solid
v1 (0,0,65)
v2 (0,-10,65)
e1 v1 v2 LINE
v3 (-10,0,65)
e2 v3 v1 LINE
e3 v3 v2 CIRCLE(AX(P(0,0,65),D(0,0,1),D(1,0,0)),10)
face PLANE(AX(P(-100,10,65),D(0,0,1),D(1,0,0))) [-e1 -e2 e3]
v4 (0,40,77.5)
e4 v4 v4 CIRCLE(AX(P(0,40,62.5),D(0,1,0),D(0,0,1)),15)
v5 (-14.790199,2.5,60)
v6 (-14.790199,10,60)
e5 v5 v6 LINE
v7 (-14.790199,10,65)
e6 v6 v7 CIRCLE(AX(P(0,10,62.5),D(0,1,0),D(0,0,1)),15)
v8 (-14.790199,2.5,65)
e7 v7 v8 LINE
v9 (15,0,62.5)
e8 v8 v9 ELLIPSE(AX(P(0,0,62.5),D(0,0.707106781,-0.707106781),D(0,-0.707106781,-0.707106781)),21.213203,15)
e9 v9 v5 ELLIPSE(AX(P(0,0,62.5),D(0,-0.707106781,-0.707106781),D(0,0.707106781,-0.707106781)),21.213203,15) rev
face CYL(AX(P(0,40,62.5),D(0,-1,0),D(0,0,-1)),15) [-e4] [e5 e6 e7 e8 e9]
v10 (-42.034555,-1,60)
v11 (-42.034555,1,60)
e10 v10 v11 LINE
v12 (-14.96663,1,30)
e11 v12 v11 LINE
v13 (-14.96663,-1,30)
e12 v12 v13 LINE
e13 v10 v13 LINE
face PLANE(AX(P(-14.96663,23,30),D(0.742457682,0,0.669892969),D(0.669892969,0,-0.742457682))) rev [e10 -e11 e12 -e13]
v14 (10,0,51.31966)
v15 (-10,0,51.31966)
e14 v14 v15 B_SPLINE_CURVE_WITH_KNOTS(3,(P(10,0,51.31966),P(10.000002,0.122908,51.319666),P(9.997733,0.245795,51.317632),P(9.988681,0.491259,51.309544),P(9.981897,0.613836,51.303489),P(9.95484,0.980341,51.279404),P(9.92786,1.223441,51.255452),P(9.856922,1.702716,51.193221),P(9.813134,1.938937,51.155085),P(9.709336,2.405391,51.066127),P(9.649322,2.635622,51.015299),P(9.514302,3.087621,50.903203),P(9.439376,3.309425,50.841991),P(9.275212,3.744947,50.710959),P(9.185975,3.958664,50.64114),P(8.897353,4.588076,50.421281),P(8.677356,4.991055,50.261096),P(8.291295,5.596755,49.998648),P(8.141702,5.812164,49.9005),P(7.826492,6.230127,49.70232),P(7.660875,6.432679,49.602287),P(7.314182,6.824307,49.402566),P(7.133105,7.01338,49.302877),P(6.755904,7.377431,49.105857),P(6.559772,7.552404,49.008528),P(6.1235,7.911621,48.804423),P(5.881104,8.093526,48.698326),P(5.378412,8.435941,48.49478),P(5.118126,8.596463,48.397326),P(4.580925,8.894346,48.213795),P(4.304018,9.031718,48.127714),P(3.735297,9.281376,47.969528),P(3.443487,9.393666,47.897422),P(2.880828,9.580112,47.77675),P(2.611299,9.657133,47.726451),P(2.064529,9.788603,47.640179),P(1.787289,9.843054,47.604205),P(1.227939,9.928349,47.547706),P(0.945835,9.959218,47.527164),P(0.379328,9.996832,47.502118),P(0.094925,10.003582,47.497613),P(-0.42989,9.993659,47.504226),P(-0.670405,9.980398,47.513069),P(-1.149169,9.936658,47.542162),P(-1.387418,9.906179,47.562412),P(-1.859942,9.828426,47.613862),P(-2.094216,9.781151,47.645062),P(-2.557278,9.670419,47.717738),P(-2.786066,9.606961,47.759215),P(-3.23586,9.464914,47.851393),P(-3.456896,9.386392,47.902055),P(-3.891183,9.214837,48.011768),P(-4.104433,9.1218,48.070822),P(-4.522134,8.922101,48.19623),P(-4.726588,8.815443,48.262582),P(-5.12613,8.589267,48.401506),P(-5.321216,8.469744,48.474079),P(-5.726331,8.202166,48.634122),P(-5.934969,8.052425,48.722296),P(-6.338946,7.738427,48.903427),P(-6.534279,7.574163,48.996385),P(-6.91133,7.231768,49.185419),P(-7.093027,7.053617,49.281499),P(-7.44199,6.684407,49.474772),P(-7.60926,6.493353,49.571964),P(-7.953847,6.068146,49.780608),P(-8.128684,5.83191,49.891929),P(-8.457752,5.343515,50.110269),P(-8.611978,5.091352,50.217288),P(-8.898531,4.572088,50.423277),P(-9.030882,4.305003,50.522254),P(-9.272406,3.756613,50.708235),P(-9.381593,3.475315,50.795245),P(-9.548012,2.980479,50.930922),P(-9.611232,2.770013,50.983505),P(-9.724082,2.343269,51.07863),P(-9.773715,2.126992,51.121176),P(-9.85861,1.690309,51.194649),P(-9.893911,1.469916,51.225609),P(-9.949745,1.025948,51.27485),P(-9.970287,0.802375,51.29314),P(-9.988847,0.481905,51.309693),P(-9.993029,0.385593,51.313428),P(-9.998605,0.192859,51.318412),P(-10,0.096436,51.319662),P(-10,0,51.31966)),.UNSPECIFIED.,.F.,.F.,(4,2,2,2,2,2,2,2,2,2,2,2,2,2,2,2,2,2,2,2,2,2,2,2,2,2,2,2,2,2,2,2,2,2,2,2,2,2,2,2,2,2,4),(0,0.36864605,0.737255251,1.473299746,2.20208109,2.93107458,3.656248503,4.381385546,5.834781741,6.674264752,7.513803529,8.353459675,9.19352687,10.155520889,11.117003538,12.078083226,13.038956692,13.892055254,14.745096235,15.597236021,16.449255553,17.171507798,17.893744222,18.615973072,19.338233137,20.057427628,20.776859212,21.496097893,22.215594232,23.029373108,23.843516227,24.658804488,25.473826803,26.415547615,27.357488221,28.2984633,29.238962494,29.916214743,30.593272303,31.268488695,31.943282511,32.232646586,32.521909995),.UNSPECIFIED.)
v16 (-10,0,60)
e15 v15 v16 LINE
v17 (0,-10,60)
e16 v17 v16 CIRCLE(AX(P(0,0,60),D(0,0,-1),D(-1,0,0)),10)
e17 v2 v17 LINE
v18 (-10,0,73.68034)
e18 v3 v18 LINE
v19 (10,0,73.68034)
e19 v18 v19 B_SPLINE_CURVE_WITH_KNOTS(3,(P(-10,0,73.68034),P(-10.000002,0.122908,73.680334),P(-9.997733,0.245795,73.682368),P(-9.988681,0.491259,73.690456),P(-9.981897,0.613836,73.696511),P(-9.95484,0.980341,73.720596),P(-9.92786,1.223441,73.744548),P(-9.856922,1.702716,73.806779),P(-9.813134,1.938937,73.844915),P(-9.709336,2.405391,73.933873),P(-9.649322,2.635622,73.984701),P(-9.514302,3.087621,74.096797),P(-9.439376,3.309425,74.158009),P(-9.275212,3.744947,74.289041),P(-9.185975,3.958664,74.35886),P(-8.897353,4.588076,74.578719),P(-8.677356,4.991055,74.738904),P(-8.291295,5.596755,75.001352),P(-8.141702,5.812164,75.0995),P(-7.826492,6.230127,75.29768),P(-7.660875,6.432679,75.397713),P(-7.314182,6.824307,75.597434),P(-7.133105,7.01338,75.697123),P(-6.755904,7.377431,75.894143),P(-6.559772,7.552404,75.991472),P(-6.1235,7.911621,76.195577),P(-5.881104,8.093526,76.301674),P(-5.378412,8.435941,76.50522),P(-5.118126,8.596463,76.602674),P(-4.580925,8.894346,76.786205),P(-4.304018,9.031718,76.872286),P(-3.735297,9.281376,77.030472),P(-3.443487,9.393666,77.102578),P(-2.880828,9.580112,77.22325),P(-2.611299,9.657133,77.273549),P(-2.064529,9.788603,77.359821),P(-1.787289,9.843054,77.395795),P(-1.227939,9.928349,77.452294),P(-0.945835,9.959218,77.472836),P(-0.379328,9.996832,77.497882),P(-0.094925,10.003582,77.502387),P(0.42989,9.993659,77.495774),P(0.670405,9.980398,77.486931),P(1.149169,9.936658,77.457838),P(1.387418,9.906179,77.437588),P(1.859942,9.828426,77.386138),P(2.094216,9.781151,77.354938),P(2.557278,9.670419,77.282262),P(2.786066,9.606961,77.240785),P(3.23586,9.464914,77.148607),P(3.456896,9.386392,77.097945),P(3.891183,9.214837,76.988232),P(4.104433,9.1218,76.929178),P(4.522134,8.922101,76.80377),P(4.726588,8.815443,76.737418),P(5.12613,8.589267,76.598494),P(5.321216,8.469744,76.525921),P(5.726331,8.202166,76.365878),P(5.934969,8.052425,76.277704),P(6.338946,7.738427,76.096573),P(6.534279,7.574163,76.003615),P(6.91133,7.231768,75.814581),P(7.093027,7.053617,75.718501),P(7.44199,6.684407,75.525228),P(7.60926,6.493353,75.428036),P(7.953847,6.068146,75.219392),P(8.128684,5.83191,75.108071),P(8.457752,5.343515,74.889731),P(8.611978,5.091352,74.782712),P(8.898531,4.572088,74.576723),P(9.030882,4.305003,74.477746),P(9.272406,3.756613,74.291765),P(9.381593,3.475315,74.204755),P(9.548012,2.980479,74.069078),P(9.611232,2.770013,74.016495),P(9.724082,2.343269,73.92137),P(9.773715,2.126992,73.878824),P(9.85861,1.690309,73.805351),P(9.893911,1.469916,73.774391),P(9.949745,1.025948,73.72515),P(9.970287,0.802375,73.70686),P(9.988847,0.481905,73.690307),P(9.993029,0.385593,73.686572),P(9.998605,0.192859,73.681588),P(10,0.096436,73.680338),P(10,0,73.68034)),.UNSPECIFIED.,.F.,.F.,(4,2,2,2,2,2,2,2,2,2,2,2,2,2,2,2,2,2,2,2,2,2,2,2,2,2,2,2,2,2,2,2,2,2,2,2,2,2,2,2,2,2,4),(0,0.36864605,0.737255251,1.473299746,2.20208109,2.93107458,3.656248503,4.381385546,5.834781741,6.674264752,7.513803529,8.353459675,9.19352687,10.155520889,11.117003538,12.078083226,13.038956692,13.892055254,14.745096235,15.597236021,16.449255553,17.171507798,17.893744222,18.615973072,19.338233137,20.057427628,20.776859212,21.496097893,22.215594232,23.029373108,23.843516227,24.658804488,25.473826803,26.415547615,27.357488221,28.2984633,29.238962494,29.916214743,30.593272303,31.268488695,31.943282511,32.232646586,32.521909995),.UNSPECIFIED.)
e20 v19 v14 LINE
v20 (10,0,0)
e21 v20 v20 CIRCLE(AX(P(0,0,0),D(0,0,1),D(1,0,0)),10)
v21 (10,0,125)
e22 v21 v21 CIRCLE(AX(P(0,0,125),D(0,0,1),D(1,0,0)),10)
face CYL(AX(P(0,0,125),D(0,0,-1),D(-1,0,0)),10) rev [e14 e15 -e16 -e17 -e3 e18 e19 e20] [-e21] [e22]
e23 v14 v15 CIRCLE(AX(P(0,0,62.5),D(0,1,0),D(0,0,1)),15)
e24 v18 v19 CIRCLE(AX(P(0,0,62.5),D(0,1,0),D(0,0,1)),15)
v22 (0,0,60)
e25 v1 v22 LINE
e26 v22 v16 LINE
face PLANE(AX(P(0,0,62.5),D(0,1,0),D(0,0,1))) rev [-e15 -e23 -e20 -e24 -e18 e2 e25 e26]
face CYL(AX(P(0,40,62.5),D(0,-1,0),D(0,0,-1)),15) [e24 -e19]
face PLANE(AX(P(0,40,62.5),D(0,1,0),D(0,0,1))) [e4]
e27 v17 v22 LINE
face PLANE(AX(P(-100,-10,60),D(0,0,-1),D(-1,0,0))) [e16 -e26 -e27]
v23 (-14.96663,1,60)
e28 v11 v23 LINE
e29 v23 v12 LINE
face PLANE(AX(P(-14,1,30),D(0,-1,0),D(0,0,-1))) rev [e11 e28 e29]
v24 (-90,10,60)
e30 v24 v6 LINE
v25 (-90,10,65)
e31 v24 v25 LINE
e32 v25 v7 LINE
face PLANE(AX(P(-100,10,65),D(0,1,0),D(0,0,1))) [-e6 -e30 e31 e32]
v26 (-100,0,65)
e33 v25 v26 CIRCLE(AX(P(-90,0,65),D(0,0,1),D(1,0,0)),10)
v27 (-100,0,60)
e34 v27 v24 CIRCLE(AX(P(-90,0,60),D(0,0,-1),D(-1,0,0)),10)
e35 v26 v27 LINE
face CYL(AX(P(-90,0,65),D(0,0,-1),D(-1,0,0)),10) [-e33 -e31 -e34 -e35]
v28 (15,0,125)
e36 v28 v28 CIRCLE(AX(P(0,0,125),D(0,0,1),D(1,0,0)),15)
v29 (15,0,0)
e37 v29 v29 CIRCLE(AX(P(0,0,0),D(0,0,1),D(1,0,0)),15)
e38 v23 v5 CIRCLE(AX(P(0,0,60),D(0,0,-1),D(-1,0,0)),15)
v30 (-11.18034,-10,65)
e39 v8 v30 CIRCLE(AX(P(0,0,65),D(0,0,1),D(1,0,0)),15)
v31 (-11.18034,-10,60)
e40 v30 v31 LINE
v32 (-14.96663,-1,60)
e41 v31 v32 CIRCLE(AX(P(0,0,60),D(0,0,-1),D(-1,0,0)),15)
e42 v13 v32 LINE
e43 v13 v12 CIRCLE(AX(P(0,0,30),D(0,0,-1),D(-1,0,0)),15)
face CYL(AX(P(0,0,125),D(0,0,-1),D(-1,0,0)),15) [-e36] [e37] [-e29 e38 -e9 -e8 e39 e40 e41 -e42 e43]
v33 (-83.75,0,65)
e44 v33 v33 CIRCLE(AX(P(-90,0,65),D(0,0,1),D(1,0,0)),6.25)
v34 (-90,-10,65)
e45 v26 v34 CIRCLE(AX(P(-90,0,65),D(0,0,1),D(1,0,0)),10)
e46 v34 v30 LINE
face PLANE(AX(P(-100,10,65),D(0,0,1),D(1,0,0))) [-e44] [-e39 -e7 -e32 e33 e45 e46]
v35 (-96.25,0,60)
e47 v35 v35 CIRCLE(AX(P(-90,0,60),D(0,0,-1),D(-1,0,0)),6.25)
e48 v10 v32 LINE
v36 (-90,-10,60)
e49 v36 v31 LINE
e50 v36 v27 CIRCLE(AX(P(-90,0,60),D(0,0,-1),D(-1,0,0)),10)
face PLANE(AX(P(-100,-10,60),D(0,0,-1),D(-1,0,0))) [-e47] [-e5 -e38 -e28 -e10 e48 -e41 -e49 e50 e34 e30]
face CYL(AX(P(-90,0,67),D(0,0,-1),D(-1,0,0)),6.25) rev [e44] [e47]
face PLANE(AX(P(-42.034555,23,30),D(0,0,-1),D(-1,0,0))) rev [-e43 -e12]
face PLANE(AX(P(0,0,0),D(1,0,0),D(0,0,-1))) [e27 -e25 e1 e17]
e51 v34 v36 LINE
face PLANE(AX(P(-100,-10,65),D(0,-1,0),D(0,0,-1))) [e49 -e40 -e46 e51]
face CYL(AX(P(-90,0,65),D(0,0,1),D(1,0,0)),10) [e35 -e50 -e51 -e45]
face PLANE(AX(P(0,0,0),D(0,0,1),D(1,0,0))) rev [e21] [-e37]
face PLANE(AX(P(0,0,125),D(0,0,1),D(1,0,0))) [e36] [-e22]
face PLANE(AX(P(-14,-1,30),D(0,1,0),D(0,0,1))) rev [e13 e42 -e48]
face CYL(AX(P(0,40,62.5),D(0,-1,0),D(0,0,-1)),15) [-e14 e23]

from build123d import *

# Parameters (mm, degrees)
SKETCH1_R               = 15
SKETCH1_R_2             = 10
BOSS_EXTRUDE1_DEPTH     = 125
SKETCH2_R               = 15
BOSS_EXTRUDE2_DEPTH     = 40
SKETCH11_W              = 5
SKETCH11_H              = 20
BOSS_EXTRUDE6_DEPTH     = 100
FILLET1_R               = 10
SKETCH12_W              = 28.03455484
SKETCH12_H              = 2
BOSS_EXTRUDE7_DEPTH     = 30
CUT_EXTRUDE1_DEPTH      = 23
CUT_EXTRUDE1_DEPTH_BACK = 5
SKETCH16_R              = 6.25
CUT_EXTRUDE2_DEPTH      = 7


with BuildPart() as part:
    # Sketch1 → Boss-Extrude1 (new body)
    with BuildSketch(Plane.XY):
        Circle(SKETCH1_R)
        Circle(SKETCH1_R_2, mode=Mode.SUBTRACT)
    extrude(amount=BOSS_EXTRUDE1_DEPTH)

    # Sketch2 → Boss-Extrude2 (add)
    with BuildSketch(Plane(origin=(0, 0, 0), x_dir=(1, 0, 0), z_dir=(0, 1, 0))):
        with Locations((0, -62.5)):
            Circle(SKETCH2_R)
    extrude(amount=BOSS_EXTRUDE2_DEPTH)

    # Sketch11 → Boss-Extrude6 (add)
    with BuildSketch(Plane(origin=(0, 0, 0), x_dir=(0, 0, -1), z_dir=(1, 0, 0))):
        with Locations((-62.5, 0)):
            Rectangle(SKETCH11_W, SKETCH11_H)
    extrude(amount=-BOSS_EXTRUDE6_DEPTH)

    # Fillet1
    fillet1_edges = [part.edges().sort_by_distance(p)[0] for p in [
        (-100, -10, 62.5),
        (-100, 10, 62.5),
    ]]
    fillet(fillet1_edges, radius=FILLET1_R - 0.0001)  # a hair under: the kernel refuses the full size

    # Sketch12 → Boss-Extrude7 (add)
    with BuildSketch(Plane(origin=(0, 0, 60), x_dir=(-1, 0, 0), z_dir=(0, 0, -1))):
        with Locations((28.01727742, 0)):
            Rectangle(SKETCH12_W, SKETCH12_H)
    extrude(amount=BOSS_EXTRUDE7_DEPTH)

    # Sketch13 → Cut-Extrude1 (cut, two sides: drawn at the far end of the back side and taken through both)
    with BuildSketch(Plane(origin=(0, 0, 0), x_dir=(1, 0, 0), z_dir=(0, 1, 0)).offset(-CUT_EXTRUDE1_DEPTH_BACK)):
        Polygon((-14.966629547, -30), (-42.03455484, -60), (-42.03455484, -30), align=None)
    extrude(amount=CUT_EXTRUDE1_DEPTH + CUT_EXTRUDE1_DEPTH_BACK, mode=Mode.SUBTRACT)

    # Sketch16 → Cut-Extrude2 (cut)
    with BuildSketch(Plane(origin=(0, 0, 60), x_dir=(-1, 0, 0), z_dir=(0, 0, -1))):
        with Locations((90, 0)):
            Circle(SKETCH16_R)
    extrude(amount=-CUT_EXTRUDE2_DEPTH, mode=Mode.SUBTRACT)


solid = part.part
